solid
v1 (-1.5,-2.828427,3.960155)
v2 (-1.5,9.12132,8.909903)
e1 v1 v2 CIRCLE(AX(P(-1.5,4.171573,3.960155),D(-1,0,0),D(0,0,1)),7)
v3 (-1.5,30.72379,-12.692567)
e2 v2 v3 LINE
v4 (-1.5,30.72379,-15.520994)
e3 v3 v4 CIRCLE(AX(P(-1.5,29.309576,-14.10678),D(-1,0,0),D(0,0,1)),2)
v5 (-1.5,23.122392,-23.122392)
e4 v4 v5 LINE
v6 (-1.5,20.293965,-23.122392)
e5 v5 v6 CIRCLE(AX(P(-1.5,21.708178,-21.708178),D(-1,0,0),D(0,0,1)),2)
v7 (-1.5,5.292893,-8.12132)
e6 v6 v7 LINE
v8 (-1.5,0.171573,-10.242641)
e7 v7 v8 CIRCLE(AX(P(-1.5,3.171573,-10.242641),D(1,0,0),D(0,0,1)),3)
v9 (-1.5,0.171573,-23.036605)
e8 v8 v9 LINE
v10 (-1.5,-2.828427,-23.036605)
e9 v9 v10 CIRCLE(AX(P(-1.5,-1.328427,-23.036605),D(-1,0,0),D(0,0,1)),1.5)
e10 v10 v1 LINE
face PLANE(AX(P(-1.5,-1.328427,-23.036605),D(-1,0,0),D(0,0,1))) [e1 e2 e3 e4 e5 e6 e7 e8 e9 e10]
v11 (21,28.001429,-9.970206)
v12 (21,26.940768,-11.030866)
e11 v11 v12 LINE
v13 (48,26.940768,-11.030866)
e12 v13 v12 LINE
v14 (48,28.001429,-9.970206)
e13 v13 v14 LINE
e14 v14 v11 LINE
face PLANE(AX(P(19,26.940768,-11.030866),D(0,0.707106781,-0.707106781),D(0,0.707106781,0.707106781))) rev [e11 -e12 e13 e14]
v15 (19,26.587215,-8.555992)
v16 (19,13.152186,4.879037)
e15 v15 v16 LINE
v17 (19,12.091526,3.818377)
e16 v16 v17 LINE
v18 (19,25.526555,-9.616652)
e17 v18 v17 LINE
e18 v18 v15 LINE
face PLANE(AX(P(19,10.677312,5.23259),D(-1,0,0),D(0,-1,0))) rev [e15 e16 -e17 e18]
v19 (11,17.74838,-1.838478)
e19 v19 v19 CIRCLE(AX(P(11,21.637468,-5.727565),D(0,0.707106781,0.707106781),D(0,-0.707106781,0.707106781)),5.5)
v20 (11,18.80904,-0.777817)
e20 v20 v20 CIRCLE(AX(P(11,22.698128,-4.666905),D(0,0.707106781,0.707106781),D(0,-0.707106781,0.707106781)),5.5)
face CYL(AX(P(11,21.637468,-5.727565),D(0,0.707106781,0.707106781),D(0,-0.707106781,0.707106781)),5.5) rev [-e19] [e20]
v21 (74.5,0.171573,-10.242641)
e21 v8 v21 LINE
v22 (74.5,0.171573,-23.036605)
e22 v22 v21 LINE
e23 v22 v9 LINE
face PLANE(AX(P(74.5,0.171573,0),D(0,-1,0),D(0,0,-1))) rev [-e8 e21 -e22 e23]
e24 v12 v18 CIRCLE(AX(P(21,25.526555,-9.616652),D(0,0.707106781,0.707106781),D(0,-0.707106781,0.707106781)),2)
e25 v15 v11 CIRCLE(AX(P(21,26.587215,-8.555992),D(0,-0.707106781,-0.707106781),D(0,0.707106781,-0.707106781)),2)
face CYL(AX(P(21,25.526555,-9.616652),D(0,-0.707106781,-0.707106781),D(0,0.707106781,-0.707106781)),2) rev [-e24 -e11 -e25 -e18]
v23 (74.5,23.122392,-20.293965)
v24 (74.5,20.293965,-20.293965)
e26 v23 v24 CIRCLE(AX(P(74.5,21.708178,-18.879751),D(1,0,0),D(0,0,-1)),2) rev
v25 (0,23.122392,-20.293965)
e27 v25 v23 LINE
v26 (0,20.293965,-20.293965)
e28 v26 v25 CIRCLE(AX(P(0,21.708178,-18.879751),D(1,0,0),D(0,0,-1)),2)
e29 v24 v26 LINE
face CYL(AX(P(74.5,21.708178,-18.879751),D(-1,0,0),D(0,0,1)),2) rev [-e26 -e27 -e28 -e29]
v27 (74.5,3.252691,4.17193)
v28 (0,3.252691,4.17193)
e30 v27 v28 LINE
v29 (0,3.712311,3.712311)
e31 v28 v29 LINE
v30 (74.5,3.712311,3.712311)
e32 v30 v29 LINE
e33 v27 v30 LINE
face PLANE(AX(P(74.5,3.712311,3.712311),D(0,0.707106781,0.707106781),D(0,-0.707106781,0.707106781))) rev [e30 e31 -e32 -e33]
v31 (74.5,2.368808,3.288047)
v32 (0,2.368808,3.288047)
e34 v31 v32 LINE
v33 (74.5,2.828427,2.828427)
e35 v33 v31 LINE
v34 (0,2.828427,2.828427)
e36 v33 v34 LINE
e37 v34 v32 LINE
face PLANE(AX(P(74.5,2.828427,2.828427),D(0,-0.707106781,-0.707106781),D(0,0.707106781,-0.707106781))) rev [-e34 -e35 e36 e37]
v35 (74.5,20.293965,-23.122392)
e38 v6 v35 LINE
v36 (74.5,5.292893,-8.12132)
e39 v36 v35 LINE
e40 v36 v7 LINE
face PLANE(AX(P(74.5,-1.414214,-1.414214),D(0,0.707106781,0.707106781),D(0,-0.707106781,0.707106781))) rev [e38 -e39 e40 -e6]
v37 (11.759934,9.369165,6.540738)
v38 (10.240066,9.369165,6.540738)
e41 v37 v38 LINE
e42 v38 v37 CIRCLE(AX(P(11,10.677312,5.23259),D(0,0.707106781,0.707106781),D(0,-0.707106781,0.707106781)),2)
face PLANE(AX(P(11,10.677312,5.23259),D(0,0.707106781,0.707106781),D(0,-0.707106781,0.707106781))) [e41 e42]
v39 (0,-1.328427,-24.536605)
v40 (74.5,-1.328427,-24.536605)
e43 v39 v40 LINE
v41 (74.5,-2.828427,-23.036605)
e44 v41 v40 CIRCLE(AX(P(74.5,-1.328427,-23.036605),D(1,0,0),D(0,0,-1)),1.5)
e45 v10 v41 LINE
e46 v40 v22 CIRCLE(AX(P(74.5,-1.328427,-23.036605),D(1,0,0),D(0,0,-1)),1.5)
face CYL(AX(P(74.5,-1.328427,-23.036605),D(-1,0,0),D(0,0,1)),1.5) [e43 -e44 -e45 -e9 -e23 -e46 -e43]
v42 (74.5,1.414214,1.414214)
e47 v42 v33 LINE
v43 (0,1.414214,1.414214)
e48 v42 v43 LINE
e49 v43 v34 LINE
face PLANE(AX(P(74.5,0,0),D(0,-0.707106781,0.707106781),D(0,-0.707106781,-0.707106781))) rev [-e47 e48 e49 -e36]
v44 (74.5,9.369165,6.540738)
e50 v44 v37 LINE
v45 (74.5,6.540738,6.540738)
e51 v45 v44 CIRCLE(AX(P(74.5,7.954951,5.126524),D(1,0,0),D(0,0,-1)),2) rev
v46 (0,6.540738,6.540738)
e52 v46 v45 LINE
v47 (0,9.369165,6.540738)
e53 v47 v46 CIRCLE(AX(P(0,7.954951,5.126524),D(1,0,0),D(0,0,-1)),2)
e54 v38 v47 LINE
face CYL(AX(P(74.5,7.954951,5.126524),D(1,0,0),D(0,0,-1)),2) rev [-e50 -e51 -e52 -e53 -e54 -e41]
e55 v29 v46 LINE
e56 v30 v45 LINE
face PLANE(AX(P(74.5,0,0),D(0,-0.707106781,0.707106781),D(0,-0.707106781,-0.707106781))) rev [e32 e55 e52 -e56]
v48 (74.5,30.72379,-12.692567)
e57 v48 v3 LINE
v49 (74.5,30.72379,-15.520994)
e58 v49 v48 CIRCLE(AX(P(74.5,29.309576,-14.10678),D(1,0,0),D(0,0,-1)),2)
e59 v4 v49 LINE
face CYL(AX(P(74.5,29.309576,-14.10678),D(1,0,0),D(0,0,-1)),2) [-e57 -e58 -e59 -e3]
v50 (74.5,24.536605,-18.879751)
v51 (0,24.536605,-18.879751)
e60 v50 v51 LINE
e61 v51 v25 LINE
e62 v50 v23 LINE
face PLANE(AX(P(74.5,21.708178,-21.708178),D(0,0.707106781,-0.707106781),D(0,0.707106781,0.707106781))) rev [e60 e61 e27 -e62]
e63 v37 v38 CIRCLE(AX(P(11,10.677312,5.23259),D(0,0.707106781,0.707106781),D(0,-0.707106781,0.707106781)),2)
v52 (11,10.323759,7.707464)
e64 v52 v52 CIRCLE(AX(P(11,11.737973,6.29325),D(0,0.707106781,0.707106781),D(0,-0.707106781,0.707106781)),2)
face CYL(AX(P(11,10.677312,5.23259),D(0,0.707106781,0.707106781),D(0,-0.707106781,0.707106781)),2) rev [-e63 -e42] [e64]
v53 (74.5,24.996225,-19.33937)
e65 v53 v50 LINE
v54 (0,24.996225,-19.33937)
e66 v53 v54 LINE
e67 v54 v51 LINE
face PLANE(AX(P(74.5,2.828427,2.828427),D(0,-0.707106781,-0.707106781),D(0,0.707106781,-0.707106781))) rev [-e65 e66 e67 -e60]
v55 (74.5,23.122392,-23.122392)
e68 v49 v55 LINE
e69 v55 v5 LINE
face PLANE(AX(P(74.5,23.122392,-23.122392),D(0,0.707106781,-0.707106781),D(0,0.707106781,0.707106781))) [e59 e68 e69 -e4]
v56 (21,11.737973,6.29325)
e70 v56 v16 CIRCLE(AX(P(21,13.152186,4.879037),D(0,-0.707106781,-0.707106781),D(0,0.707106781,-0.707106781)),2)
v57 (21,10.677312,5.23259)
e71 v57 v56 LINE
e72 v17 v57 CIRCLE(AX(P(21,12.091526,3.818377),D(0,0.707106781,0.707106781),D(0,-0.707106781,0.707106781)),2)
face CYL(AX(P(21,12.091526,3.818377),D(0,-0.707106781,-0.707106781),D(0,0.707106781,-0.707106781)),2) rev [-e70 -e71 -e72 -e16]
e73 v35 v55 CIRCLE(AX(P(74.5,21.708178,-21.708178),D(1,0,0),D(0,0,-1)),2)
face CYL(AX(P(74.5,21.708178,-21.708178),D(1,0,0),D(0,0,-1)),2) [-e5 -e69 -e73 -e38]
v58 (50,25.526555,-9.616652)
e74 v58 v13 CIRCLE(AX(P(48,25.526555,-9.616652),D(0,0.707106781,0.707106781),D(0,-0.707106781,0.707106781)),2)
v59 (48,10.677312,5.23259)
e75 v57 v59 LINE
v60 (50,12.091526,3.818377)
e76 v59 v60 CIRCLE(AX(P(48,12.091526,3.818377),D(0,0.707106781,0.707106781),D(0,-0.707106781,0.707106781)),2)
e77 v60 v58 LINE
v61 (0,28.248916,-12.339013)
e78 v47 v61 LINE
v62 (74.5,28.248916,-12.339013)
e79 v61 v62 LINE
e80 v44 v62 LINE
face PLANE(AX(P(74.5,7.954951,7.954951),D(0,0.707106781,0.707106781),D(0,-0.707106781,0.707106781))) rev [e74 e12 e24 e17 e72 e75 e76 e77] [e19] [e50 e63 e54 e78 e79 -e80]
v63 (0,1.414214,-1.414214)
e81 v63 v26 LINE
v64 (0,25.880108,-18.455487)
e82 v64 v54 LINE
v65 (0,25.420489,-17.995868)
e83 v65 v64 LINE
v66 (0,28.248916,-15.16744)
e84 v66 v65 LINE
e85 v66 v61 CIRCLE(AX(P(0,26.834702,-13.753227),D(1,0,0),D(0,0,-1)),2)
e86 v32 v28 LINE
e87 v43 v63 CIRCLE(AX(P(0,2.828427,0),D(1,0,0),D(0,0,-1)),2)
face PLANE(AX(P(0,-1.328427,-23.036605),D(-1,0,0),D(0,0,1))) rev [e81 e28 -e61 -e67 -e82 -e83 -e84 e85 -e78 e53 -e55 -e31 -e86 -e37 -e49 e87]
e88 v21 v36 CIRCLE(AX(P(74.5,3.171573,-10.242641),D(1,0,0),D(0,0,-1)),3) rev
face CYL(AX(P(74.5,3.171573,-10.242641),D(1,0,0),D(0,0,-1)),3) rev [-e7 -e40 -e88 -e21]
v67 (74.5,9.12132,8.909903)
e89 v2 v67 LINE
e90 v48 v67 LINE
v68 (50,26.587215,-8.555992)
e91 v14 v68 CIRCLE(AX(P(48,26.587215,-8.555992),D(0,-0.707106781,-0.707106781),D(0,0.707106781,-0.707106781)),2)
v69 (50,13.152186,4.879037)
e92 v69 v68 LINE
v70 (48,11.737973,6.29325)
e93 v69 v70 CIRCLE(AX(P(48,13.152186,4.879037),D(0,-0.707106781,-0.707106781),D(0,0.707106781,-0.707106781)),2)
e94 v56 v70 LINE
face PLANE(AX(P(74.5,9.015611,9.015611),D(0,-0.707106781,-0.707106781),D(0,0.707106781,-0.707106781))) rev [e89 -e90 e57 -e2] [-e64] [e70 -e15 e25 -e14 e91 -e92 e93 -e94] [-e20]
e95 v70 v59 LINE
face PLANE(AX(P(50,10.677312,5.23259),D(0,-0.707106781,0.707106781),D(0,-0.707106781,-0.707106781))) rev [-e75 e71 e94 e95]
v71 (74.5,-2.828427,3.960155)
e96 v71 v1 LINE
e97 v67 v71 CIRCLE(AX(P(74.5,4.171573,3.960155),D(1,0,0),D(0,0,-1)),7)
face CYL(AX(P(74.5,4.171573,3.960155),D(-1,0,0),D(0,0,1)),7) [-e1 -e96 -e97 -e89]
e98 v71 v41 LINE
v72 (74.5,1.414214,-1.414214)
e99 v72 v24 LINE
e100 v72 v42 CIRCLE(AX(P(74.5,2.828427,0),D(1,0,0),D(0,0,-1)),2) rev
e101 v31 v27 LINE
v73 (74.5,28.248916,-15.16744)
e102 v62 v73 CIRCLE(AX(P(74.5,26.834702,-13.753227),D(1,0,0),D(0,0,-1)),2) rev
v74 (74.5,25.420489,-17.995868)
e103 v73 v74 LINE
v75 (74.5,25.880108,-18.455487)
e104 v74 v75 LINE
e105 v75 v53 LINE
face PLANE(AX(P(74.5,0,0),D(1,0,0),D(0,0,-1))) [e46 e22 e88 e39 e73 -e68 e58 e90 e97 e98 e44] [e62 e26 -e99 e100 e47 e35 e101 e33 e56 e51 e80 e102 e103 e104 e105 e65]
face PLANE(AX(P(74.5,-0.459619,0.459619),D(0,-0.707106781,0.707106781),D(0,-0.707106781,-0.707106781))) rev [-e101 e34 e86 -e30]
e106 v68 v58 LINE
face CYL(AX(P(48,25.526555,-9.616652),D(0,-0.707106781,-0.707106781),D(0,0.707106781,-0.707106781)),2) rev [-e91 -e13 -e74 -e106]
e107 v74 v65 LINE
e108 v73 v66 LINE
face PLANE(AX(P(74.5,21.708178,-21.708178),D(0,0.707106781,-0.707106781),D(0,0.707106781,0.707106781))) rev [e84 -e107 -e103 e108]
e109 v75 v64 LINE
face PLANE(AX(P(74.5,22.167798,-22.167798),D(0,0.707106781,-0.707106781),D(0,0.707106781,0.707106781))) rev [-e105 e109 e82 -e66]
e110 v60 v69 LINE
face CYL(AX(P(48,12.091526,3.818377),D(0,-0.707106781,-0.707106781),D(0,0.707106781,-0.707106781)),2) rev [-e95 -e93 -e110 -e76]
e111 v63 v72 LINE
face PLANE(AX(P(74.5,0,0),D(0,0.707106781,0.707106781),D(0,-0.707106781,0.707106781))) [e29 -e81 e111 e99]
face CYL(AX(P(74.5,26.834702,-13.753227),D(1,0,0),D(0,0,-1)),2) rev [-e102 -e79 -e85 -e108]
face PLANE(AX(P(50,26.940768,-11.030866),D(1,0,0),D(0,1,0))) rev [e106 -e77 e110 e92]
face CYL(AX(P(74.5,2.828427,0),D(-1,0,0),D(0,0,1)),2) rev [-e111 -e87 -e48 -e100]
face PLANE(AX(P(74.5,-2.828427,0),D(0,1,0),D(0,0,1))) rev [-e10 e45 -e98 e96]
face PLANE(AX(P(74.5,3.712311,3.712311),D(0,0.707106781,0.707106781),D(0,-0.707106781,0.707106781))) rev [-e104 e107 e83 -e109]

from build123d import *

# Parameters (mm, degrees)
BOSS_EXTRUDE1_DEPTH = 74.5
FILLET1_R           = 7
FILLET2_R           = 2
FILLET3_R           = 1.5
FILLET4_R           = 3
SKETCH3_R           = 5.5
SKETCH3_R_2         = 2
SKETCH3_W           = 31
SKETCH3_H           = 23
CUT_EXTRUDE1_DEPTH  = 1.5
FILLET5_R           = 2
BOSS_EXTRUDE3_DEPTH = 1.5


with BuildPart() as part:
    # Sketch1 → Boss-Extrude1 (new body)
    with BuildSketch(Plane(origin=(0, 0, 0), x_dir=(0, 0, -1), z_dir=(1, 0, 0))):
        Polygon((-20.859650045, -2.828427125), (0, -2.828427125), (24.536605307, -2.828427125), (24.536605307, 0.171572875), (3, 0.171572875), (24.536605307, 21.708178182), (14.106780285, 32.138003205), (-10.429825023, 7.601397898), align=None)
        Polygon((19.339370465, 24.996224715), (18.879751058, 24.536605307), (21.708178182, 21.708178182), (0, 0), (-2.828427125, 2.828427125), (-3.288046533, 2.368807717), (-4.171930009, 3.252691193), (-3.712310601, 3.712310601), (-7.954951288, 7.954951288), (13.753226894, 29.663129471), (17.995867581, 25.420488784), (18.455486989, 25.880108191), align=None, mode=Mode.SUBTRACT)
    extrude(amount=BOSS_EXTRUDE1_DEPTH)

    # Fillet1
    fillet1_edges = [part.edges().sort_by_distance(p)[0] for p in [
        (37.25, -2.828427125, 20.859650045),
    ]]
    fillet(fillet1_edges, radius=FILLET1_R)

    # Fillet2
    fillet2_edges = [part.edges().sort_by_distance(p)[0] for p in [
        (37.25, 32.138003205, -14.106780285),
        (37.25, 21.708178182, -24.536605307),
        (37.25, 29.663129471, -13.753226894),
        (37.25, 7.954951288, 7.954951288),
        (37.25, 0, 0),
        (37.25, 21.708178182, -21.708178182),
    ]]
    fillet(fillet2_edges, radius=FILLET2_R)

    # Fillet3
    fillet3_edges = [part.edges().sort_by_distance(p)[0] for p in [
        (37.25, -2.828427125, -24.536605307),
        (37.25, 0.171572875, -24.536605307),
    ]]
    fillet(fillet3_edges, radius=FILLET3_R - 0.0001)  # a hair under: the kernel refuses the full size

    # Fillet4
    fillet4_edges = [part.edges().sort_by_distance(p)[0] for p in [
        (37.25, 0.171572875, -3),
    ]]
    fillet(fillet4_edges, radius=FILLET4_R)

    # Sketch3 → Cut-Extrude1 (cut)
    with BuildSketch(Plane(origin=(0, 9.01561146, 9.01561146), x_dir=(1, 0, 0), z_dir=(0, 0.7071067811865475, 0.7071067811865476))):
        with Locations(Location((11, 19.35, 0), (0, 0, 270))):
            Circle(SKETCH3_R)
        with Locations(Location((11, 3.85, 0), (0, 0, 270))):
            Circle(SKETCH3_R_2)
        with Locations((34.5, 15.35)):
            Rectangle(SKETCH3_W, SKETCH3_H)
    extrude(amount=-CUT_EXTRUDE1_DEPTH, mode=Mode.SUBTRACT)

    # Fillet5
    fillet5_edges = [part.edges().sort_by_distance(p)[0] for p in [
        (19, 11.207642482, 5.762920267),
        (19, 27.471098449, -10.500535701),
        (50, 27.471098449, -10.500535701),
        (50, 11.207642482, 5.762920267),
    ]]
    fillet(fillet5_edges, radius=FILLET5_R)

    # Sketch4 → Boss-Extrude3 (add)
    with BuildSketch(Plane.ZY):
        with BuildLine():
            Line((-23.036605307, -2.828427125), (3.960155108, -2.828427125))
            ThreePointArc((3.960155108, -2.828427125), (10.427311836, 1.492788849), (8.909902577, 9.121320344))
            Line((8.909902577, 9.121320344), (-12.692566722, 30.723789643))
            ThreePointArc((-12.692566722, 30.723789643), (-14.106780285, 31.30957608), (-15.520993847, 30.723789643))
            Line((-15.520993847, 30.723789643), (-23.122391745, 23.122391745))
            ThreePointArc((-23.122391745, 23.122391745), (-23.708178182, 21.708178182), (-23.122391745, 20.29396462))
            Line((-23.122391745, 20.29396462), (-8.121320344, 5.292893219))
            ThreePointArc((-8.121320344, 5.292893219), (-7.47100209, 2.023522578), (-10.242640687, 0.171572875))
            Line((-10.242640687, 0.171572875), (-23.036605307, 0.171572875))
            ThreePointArc((-23.036605307, 0.171572875), (-24.097265479, -0.267766953), (-24.536605307, -1.328427125))
            ThreePointArc((-24.536605307, -1.328427125), (-24.097265479, -2.389087297), (-23.036605307, -2.828427125))
        make_face()
    extrude(amount=BOSS_EXTRUDE3_DEPTH)


solid = part.part
